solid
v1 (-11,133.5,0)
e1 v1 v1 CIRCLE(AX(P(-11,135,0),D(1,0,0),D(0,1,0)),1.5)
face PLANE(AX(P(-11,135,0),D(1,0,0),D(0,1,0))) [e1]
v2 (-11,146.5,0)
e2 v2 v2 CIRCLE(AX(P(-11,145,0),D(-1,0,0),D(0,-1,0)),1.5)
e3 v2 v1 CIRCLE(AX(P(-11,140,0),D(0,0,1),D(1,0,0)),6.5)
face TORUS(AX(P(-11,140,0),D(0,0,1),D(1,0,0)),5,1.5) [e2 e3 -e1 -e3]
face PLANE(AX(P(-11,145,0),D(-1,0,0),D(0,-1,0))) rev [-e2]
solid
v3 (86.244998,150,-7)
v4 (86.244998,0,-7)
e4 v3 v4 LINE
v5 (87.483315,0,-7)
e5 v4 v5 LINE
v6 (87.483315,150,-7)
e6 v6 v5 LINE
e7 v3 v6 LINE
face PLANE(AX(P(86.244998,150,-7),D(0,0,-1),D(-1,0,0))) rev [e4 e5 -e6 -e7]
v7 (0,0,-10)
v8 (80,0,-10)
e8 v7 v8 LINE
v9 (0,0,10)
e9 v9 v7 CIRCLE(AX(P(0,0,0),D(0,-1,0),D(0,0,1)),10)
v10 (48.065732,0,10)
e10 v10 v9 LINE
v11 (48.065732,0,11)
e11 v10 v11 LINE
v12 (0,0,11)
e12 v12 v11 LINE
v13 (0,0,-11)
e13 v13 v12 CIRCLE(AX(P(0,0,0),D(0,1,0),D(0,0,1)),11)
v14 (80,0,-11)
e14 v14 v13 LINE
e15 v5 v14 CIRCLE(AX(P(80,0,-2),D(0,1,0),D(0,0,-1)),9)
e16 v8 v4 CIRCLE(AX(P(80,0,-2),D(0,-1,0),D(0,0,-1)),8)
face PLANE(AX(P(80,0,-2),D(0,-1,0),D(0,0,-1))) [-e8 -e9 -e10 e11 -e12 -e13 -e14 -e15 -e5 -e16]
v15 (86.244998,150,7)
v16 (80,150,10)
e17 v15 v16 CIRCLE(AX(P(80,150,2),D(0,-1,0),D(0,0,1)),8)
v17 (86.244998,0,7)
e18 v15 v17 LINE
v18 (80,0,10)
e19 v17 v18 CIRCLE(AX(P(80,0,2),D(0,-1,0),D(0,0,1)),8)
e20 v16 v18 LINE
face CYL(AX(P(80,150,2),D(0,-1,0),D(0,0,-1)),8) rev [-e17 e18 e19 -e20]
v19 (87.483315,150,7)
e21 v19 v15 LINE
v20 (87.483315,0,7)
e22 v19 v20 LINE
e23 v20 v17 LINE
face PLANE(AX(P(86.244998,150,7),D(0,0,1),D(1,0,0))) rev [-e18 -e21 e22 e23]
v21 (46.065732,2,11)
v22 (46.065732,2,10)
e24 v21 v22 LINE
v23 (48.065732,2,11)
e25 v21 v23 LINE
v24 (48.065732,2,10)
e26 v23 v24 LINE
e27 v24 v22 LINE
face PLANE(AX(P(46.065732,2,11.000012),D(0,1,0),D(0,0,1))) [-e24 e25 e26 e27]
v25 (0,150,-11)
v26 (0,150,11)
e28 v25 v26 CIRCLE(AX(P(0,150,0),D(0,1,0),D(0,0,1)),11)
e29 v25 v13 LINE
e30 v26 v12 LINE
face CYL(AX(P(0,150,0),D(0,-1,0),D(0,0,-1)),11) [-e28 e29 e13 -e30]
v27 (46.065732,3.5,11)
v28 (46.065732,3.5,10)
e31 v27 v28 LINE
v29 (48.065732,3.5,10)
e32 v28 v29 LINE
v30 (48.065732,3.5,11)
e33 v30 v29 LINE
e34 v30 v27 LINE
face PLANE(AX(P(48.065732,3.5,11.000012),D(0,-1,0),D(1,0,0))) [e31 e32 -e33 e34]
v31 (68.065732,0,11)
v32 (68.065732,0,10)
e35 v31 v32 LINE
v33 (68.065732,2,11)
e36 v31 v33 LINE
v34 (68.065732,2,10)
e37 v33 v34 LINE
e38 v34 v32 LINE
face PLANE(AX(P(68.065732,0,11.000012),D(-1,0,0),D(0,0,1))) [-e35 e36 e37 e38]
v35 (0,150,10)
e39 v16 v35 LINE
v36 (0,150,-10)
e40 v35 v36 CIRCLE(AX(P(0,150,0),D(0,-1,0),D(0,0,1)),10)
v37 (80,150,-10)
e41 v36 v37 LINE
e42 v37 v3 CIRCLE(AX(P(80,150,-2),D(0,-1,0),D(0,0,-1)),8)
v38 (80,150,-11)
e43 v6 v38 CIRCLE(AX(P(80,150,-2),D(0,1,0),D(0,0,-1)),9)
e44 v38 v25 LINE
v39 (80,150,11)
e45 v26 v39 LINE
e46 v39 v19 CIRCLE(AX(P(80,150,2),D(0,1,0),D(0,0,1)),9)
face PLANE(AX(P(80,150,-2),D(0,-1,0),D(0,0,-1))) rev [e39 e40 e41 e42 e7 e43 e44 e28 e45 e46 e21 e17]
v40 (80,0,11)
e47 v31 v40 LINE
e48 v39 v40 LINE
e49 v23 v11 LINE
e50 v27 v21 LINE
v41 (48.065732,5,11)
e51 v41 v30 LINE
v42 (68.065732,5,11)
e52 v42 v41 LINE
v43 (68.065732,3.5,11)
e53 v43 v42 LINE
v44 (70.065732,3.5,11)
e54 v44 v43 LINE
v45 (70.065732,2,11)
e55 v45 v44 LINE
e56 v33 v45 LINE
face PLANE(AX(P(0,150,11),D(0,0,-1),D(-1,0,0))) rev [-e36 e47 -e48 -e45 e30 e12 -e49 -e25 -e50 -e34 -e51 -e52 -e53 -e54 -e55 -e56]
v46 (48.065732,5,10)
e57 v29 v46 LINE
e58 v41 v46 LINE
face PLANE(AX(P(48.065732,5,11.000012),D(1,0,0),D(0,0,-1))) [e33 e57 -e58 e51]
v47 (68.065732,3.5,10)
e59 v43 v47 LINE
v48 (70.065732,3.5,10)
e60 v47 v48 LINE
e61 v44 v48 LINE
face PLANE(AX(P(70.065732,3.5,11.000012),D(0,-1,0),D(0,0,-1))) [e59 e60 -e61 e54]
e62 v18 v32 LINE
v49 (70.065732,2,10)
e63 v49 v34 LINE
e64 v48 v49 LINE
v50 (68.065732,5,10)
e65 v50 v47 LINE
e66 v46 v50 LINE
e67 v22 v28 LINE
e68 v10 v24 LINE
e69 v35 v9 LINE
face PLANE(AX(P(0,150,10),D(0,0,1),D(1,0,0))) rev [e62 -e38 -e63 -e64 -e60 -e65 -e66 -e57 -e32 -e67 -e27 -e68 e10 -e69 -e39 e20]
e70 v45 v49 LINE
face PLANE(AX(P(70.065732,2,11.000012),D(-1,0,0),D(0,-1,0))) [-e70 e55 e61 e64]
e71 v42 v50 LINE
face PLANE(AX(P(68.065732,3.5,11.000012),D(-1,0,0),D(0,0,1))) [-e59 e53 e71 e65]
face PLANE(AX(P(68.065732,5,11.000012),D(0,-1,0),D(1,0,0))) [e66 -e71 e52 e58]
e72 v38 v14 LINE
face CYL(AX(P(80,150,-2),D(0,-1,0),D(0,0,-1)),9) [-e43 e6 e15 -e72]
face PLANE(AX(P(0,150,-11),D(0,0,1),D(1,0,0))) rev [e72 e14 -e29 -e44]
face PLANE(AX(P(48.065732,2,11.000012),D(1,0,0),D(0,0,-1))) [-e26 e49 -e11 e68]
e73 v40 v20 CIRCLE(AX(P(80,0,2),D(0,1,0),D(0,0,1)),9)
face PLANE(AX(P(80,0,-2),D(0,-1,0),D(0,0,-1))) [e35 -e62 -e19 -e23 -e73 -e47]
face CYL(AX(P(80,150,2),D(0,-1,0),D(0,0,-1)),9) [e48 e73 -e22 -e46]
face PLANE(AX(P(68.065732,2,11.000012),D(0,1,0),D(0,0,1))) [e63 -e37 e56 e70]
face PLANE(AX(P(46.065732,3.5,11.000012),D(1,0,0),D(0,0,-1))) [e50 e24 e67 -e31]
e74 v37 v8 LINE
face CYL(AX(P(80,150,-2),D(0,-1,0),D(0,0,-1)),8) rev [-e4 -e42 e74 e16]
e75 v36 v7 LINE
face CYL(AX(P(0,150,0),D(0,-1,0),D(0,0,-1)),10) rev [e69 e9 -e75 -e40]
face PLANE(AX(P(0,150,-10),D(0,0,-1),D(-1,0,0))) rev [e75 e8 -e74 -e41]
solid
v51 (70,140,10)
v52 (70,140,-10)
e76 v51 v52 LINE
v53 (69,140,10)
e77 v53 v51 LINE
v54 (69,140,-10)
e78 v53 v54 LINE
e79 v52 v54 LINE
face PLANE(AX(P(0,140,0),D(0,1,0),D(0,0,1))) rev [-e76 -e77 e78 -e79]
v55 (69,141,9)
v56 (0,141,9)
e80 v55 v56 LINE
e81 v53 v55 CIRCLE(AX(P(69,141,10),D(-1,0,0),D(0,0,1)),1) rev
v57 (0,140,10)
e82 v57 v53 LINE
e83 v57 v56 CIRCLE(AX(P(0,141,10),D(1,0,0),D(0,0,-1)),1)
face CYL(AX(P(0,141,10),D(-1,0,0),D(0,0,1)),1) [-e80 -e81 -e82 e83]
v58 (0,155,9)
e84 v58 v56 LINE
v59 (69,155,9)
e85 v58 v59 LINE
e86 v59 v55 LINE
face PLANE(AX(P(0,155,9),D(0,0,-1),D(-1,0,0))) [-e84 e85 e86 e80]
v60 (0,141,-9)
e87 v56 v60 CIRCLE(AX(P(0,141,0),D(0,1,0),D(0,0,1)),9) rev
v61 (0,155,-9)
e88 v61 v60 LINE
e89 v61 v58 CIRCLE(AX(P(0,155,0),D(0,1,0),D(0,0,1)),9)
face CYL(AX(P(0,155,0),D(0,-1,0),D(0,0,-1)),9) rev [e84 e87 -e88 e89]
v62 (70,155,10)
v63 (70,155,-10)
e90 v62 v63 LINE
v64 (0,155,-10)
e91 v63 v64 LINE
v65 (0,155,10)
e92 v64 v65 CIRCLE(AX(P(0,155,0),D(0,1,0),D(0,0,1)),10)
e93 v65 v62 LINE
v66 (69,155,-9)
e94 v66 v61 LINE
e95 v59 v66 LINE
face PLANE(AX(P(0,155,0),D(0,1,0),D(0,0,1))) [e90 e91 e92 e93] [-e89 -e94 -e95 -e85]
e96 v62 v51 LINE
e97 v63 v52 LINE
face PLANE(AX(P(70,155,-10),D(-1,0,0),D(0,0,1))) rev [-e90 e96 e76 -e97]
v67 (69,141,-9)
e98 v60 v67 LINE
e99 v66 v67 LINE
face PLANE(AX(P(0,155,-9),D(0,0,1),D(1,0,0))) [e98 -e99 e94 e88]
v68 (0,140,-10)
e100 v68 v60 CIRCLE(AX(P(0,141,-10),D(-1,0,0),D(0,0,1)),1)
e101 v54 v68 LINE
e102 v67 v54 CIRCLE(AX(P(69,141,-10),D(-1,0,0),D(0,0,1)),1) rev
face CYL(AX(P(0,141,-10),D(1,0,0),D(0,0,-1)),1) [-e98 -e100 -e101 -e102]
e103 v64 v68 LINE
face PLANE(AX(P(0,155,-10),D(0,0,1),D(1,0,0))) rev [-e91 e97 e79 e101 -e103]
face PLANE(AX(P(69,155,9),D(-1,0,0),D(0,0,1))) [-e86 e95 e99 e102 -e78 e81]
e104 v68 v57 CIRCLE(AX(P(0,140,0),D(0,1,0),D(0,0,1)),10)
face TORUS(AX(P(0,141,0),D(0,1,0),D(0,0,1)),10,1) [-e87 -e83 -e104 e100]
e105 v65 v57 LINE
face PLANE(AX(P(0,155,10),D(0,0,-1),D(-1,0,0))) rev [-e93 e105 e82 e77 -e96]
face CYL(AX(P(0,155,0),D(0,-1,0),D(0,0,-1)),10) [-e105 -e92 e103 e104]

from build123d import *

# Parameters (mm, degrees)
BOSS_EXTRUDE1_DEPTH     = 150
BOSS_EXTRUDE2_DEPTH     = 15
FILLET9_R               = 1
CUT_EXTRUDE1_DEPTH      = 180.338591396
CUT_EXTRUDE1_DEPTH_BACK = 21
SWEEP1_PROFILE_R        = 1.5


with BuildPart() as part:
    # Sketch3 → Boss-Extrude1 (new body)
    with BuildSketch(Plane(origin=(0, 0, 0), x_dir=(1, 0, 0), z_dir=(0, 1, 0))):
        with BuildLine():
            Line((0, 11), (80, 11))
            ThreePointArc((80, 11), (84.242640687, 9.937253933), (87.483314774, 7))
            Line((87.483314774, 7), (86.244997998, 7))
            ThreePointArc((86.244997998, 7), (83.464101615, 9.211102551), (80, 10))
            Line((80, 10), (0, 10))
            ThreePointArc((0, 10), (-10, 0), (0, -10))
            Line((0, -10), (80, -10))
            ThreePointArc((80, -10), (83.464101615, -9.211102551), (86.244997998, -7))
            Line((86.244997998, -7), (87.483314774, -7))
            ThreePointArc((87.483314774, -7), (84.242640687, -9.937253933), (80, -11))
            Line((80, -11), (0, -11))
            ThreePointArc((0, -11), (-11, 0), (0, 11))
        make_face()
    extrude(amount=BOSS_EXTRUDE1_DEPTH)

    # Sketch7 → Cut-Extrude1 (cut, two sides: drawn at the far end of the back side and taken through both)
    with BuildSketch(Plane.XY.offset(11).offset(-CUT_EXTRUDE1_DEPTH_BACK)):
        Polygon((48.06573179, 0), (68.06573179, 0), (68.06573179, 2), (70.06573179, 2), (70.06573179, 3.5), (68.06573179, 3.5), (68.06573179, 5), (48.06573179, 5), (48.06573179, 3.5), (46.06573179, 3.5), (46.06573179, 2), (48.06573179, 2), align=None)
    extrude(amount=CUT_EXTRUDE1_DEPTH + CUT_EXTRUDE1_DEPTH_BACK, mode=Mode.SUBTRACT)


with BuildPart() as body_2:
    # Sketch4 → Boss-Extrude2 (new body)
    with BuildSketch(Plane(origin=(0, 140, 0), x_dir=(1, 0, 0), z_dir=(0, 1, 0))):
        with BuildLine():
            Line((0, 10), (70, 10))
            Line((70, 10), (70, -10))
            Line((70, -10), (0, -10))
            ThreePointArc((0, -10), (-10, 0), (0, 10))
        make_face()
        with BuildLine():
            Line((0, 9), (69, 9))
            Line((69, 9), (69, -9))
            Line((69, -9), (0, -9))
            ThreePointArc((0, -9), (-9, 0), (0, 9))
        make_face(mode=Mode.SUBTRACT)
    extrude(amount=BOSS_EXTRUDE2_DEPTH)

    # Fillet9
    fillet9_edges = [body_2.edges().sort_by_distance(p)[0] for p in [
        (34.5, 140, -9),
        (-9, 140, 0),
        (34.5, 140, 9),
    ]]
    fillet(fillet9_edges, radius=FILLET9_R - 0.0001)  # a hair under: the kernel refuses the full size


with BuildPart() as body_3:
    # Sweep1: sweep along a path in Sketch9
    with BuildLine(Plane.XY) as sweep1_path:
        ThreePointArc((-11, 145), (-16, 140), (-11, 135))
    # Sweep1 profile (on start of the path) → Sweep1 (sweep)
    with BuildSketch(Plane(origin=(-11, 145, 0), x_dir=(0, -1, 0), z_dir=(-1, 0, 0))):
        Circle(SWEEP1_PROFILE_R)
    sweep(path=sweep1_path.line)


solid = Compound([part.part, body_2.part, body_3.part])
